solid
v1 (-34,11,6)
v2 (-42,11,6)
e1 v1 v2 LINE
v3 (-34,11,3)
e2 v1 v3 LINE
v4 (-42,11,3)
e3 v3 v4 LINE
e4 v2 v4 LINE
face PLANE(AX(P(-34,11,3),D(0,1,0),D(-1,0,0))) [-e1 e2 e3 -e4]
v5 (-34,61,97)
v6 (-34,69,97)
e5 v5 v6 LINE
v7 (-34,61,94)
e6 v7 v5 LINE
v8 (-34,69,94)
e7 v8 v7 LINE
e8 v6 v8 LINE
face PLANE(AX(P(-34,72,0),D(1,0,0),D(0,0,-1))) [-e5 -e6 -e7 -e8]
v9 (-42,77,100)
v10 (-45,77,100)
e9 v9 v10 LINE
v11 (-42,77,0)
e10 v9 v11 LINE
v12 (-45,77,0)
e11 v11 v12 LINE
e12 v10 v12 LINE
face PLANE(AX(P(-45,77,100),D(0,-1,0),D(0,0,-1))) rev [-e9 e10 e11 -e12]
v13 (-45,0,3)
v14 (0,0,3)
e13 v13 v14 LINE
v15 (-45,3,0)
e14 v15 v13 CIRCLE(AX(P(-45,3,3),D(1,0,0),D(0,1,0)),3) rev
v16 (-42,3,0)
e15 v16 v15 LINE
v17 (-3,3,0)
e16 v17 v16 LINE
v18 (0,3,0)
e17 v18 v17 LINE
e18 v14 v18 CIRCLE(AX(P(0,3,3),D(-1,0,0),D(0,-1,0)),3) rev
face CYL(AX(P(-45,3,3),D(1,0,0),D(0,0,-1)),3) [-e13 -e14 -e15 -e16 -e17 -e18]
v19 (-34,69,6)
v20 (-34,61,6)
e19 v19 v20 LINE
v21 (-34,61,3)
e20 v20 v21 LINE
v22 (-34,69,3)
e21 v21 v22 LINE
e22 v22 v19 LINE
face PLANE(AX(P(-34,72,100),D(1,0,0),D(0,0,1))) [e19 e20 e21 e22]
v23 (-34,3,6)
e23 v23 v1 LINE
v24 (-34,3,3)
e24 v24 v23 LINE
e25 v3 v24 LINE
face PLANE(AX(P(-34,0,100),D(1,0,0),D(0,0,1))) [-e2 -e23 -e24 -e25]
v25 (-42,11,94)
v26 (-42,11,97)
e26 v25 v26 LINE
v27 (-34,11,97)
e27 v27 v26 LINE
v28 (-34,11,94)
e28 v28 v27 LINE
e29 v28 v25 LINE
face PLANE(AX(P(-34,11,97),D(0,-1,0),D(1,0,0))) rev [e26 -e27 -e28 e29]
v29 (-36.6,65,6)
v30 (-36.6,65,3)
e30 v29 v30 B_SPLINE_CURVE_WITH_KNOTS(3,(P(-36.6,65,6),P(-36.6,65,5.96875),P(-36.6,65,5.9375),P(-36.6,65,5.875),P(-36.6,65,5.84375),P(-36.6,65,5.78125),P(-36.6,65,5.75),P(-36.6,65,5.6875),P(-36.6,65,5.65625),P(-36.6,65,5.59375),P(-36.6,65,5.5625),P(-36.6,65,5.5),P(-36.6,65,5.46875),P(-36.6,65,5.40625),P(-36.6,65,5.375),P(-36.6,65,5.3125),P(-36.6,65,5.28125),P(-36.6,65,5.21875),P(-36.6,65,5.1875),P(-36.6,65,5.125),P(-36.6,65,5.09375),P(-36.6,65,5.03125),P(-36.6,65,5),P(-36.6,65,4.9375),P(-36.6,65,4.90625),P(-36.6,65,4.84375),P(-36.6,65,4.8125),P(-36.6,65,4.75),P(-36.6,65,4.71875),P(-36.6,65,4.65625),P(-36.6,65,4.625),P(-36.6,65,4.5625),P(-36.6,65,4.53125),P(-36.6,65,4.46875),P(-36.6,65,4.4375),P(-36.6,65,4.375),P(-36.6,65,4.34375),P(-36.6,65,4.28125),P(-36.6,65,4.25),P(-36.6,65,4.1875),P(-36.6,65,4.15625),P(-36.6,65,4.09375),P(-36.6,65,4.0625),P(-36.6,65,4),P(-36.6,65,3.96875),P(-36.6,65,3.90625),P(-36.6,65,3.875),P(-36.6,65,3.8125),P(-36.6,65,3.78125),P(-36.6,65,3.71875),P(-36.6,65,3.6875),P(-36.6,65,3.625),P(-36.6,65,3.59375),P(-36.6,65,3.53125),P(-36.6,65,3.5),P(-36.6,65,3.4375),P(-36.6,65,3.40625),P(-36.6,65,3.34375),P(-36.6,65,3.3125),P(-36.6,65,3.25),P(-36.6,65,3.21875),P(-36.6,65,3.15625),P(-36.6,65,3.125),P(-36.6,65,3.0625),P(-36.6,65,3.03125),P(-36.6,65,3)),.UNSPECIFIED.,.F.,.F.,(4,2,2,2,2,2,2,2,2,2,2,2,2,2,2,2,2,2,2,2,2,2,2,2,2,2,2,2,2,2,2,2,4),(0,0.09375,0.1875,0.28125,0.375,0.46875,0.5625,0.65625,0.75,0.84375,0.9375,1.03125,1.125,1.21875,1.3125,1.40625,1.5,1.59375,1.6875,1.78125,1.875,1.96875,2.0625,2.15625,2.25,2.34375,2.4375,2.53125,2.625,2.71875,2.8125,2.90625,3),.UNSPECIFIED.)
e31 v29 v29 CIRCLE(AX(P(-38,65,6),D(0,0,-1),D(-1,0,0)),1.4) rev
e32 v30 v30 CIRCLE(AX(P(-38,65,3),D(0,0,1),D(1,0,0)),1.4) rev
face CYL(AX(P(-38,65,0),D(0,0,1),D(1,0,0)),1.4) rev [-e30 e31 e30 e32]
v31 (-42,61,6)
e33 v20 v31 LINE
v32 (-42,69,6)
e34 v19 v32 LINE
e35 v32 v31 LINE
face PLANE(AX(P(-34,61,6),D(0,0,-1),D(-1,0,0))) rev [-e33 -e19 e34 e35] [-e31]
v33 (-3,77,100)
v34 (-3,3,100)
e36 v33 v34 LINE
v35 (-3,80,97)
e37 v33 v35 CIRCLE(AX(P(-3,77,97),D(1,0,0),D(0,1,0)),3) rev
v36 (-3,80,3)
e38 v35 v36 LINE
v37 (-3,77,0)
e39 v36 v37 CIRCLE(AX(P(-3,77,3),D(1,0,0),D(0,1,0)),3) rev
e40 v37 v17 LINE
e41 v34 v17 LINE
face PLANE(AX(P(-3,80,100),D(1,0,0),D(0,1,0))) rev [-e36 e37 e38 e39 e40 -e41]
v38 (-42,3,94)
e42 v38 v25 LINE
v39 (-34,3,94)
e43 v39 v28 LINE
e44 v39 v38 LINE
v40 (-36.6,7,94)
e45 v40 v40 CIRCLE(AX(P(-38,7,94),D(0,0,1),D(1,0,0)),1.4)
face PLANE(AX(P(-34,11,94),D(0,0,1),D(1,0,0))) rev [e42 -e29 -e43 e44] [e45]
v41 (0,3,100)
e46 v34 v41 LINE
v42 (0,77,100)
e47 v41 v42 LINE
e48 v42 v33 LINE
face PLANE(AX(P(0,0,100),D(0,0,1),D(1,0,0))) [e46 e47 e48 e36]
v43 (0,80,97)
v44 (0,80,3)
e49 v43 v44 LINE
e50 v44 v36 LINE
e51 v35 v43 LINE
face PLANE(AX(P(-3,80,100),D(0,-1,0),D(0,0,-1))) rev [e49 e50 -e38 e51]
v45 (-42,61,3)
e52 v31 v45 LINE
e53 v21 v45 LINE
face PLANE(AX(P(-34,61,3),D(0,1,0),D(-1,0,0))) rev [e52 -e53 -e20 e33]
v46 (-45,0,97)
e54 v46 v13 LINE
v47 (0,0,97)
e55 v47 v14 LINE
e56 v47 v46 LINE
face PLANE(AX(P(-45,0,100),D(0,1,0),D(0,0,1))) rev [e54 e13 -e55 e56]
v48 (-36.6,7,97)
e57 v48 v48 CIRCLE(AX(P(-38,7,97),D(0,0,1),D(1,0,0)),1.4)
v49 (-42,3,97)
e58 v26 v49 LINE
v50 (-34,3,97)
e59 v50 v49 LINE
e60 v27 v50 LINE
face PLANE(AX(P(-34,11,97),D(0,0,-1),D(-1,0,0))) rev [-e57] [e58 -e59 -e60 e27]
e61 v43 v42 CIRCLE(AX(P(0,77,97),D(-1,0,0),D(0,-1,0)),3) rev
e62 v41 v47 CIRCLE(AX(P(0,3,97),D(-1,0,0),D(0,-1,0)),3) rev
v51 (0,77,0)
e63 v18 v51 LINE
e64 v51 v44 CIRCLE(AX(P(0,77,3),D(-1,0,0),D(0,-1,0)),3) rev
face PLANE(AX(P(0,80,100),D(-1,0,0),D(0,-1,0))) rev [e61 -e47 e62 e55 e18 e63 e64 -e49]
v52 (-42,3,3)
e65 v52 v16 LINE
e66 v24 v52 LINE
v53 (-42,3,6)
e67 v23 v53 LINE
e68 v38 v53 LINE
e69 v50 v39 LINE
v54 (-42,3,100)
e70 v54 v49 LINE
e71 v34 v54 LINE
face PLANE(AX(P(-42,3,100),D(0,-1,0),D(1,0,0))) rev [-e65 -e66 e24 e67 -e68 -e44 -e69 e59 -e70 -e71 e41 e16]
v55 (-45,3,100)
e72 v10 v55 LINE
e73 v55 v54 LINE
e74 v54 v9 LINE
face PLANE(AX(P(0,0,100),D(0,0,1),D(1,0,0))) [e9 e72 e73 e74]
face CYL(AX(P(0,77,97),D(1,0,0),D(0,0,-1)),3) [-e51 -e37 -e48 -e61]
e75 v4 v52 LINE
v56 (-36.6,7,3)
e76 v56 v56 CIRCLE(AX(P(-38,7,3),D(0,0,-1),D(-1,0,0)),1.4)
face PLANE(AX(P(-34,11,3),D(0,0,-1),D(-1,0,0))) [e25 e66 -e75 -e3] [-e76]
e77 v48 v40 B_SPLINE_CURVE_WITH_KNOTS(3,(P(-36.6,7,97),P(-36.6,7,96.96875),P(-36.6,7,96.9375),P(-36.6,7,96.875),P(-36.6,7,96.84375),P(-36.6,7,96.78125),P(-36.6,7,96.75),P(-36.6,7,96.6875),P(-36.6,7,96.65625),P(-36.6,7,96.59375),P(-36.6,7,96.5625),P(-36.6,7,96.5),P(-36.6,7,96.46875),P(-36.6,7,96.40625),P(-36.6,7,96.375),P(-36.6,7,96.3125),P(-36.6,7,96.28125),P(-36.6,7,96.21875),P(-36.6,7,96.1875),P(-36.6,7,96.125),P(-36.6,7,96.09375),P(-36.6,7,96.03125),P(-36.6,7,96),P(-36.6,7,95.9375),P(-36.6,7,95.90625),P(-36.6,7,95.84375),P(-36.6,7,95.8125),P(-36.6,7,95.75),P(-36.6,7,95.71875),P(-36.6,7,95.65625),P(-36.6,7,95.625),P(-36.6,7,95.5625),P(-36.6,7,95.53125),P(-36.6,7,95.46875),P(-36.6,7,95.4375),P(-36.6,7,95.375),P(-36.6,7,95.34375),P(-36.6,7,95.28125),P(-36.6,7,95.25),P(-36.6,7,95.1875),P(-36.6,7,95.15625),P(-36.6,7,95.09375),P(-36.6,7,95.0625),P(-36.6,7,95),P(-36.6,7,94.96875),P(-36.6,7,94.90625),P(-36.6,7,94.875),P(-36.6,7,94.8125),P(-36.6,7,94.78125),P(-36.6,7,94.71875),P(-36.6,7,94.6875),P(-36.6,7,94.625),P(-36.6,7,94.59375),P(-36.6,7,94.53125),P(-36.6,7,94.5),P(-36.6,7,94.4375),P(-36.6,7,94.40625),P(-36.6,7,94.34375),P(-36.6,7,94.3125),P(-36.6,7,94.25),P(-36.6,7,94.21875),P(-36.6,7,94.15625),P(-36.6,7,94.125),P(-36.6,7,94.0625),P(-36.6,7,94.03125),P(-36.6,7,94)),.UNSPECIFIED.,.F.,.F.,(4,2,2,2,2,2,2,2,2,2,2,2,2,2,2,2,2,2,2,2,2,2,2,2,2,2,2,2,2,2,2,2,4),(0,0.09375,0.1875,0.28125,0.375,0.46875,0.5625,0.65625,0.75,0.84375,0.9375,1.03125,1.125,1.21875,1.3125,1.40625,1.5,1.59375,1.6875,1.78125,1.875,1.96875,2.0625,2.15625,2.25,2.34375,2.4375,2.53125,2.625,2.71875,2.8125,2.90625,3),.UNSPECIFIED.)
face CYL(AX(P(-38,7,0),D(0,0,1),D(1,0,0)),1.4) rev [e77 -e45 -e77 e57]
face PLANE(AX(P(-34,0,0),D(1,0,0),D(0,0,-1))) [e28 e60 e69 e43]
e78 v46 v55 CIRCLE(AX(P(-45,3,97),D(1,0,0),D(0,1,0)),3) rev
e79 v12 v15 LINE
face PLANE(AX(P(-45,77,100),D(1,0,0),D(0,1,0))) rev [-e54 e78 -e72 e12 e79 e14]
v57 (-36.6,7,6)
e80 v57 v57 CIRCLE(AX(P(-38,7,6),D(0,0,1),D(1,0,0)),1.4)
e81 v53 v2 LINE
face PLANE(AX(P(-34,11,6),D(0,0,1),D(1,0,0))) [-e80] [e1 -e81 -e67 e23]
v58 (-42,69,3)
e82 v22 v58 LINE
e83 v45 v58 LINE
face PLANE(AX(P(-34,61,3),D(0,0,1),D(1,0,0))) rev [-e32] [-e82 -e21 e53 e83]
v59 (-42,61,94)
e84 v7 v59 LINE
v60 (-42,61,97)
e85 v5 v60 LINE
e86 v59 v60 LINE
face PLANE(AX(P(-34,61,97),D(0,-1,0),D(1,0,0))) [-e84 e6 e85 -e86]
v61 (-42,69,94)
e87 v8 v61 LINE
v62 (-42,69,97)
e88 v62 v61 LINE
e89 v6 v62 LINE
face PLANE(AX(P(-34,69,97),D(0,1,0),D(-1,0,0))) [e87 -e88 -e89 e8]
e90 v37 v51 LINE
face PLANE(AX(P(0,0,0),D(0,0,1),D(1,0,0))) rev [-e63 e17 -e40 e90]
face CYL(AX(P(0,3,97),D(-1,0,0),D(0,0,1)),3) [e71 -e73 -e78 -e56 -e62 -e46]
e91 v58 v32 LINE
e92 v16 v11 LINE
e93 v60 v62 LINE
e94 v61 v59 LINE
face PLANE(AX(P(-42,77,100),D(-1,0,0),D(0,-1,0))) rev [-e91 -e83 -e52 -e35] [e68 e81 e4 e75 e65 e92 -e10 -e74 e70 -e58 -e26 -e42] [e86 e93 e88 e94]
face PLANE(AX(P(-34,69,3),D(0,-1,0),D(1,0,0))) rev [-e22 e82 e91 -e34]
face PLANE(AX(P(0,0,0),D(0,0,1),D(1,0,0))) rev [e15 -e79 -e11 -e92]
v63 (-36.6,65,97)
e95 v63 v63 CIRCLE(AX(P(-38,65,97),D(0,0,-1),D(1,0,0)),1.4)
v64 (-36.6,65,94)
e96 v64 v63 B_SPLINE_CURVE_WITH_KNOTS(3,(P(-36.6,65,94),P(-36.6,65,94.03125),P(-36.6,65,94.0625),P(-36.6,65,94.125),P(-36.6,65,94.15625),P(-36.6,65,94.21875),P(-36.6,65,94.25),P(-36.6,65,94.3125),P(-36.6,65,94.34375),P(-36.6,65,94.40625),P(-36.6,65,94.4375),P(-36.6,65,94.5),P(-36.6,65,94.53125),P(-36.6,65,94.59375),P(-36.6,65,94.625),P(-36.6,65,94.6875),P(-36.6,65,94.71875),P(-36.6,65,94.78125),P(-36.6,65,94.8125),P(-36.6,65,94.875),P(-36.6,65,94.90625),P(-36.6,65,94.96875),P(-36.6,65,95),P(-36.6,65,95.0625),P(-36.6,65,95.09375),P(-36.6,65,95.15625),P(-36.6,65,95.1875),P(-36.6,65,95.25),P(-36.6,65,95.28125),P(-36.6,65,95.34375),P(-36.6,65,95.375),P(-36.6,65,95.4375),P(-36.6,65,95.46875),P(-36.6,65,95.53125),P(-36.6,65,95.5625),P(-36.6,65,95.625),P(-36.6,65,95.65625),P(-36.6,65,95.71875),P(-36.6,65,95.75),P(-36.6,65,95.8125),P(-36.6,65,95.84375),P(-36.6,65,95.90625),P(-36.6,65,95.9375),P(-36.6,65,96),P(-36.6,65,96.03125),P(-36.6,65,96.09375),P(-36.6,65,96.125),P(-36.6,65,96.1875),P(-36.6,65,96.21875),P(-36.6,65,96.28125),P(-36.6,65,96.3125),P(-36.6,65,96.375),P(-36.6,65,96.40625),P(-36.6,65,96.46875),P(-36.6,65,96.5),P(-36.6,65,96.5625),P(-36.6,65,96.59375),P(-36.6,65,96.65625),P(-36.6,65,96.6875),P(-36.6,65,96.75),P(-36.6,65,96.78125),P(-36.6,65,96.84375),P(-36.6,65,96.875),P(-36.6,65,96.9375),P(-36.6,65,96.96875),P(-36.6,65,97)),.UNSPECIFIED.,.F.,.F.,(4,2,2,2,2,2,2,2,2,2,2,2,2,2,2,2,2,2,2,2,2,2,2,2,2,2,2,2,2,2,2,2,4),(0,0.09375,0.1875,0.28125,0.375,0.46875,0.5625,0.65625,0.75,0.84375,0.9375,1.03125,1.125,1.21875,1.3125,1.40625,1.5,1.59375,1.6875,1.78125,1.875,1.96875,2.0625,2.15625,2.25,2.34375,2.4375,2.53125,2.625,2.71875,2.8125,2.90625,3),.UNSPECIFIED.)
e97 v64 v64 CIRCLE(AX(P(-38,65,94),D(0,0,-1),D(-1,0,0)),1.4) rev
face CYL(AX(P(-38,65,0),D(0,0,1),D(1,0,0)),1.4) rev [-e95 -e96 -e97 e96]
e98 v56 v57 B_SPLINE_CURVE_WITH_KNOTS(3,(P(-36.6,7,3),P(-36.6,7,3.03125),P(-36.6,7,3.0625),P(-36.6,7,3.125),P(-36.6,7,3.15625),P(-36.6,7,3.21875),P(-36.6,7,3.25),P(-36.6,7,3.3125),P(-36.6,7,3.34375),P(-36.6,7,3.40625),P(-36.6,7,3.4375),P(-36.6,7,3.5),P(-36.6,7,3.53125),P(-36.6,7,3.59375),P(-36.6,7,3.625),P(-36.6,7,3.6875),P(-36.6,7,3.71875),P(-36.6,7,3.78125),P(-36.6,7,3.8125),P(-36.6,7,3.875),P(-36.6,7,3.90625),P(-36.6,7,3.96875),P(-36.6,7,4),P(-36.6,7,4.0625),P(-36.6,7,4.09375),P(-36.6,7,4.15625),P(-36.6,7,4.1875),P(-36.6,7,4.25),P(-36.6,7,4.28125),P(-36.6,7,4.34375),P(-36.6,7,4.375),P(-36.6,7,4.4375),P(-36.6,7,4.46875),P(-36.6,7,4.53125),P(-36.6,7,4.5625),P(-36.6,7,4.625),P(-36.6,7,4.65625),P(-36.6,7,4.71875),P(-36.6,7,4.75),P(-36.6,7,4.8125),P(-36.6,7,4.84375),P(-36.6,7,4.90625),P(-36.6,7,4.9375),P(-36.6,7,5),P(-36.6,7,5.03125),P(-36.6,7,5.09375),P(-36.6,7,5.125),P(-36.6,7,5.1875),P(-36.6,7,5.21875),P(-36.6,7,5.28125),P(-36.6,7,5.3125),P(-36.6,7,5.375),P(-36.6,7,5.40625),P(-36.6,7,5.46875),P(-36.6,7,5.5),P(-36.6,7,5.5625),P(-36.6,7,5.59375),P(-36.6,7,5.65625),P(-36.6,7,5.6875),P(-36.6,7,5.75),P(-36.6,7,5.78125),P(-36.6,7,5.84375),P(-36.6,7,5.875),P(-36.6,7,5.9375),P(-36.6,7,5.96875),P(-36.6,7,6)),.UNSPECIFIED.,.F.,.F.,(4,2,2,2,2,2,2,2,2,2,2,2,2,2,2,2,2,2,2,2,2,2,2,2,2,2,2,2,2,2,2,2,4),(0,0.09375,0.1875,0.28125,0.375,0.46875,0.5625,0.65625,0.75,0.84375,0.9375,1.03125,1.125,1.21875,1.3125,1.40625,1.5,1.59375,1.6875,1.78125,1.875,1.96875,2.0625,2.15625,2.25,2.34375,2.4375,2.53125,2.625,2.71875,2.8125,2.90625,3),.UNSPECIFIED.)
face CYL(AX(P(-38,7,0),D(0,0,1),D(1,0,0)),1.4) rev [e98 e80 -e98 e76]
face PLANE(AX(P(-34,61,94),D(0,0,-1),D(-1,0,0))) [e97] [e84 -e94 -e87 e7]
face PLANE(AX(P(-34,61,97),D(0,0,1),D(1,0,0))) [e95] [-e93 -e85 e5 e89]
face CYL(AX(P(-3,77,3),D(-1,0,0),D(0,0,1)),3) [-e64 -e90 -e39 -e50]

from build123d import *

# Parameters (mm, degrees)
BOSS_EXTRUDE1_DEPTH                        = 100
SKETCH2_W                                  = 3
SKETCH2_H                                  = 8
BOSS_EXTRUDE2_DEPTH                        = 8
MIRROR1_AT_THE_SECOND_PLANE_COPY_1_SKETC_W = 3
MIRROR1_AT_THE_SECOND_PLANE_COPY_1_SKETC_H = 8
MIRROR1_AT_THE_SECOND_PLANE_COPY_1_DEPTH   = 8
SKETCH3_R                                  = 1.4
CUT_EXTRUDE1_DEPTH                         = 134.54400024
FILLET1_START                              = -46
FILLET1_DEPTH                              = 47


with BuildPart() as part:
    # Sketch1 → Boss-Extrude1 (new body)
    with BuildSketch(Plane.XY):
        Polygon((-3, 80), (0, 80), (0, 0), (-45, 0), (-45, 77), (-42, 77), (-42, 3), (-3, 3), align=None)
    extrude(amount=BOSS_EXTRUDE1_DEPTH)

    # Sketch2 → Boss-Extrude2 (add)
    with BuildSketch(Plane(origin=(-42, 0, 0), x_dir=(0, 0, -1), z_dir=(1, 0, 0))):
        with Locations((-95.5, 7)):
            Rectangle(SKETCH2_W, SKETCH2_H)
    boss_extrude2 = extrude(amount=BOSS_EXTRUDE2_DEPTH)

    # Mirror1: Boss-Extrude2 across plane
    add(boss_extrude2.mirror(Plane.ZX.offset(36)))

    # Mirror1 at the second plane: Boss-Extrude2 across plane
    add(boss_extrude2.mirror(Plane.XY.offset(50)))

    # Mirror1 at the second plane copy 1 sketc → Mirror1 at the second plane copy 1 (add)
    with BuildSketch(Plane(origin=(-42, 72, 100), x_dir=(0, 0, 1), z_dir=(1, 0, 0))):
        with Locations((-95.5, 7)):
            Rectangle(MIRROR1_AT_THE_SECOND_PLANE_COPY_1_SKETC_W, MIRROR1_AT_THE_SECOND_PLANE_COPY_1_SKETC_H)
    extrude(amount=MIRROR1_AT_THE_SECOND_PLANE_COPY_1_DEPTH)

    # Sketch3 → Cut-Extrude1 (cut, through all)
    with BuildSketch(Plane.XY.offset(97)):
        with Locations((-38, 7)):
            Circle(SKETCH3_R)
    cut_extrude1 = extrude(amount=-CUT_EXTRUDE1_DEPTH, mode=Mode.SUBTRACT)

    # Mirror2: Cut-Extrude1 across plane
    add(cut_extrude1.mirror(Plane.ZX.offset(36)), mode=Mode.SUBTRACT)

    # Fillet1: read off the stored shape, not the designer's step
    # Fillet1 outline → Fillet1 (cut)
    with BuildSketch(Plane.YZ.offset(FILLET1_START)):
        with BuildLine():
            Line((80, 0), (80, 3))
            ThreePointArc((80, 3), (79.121320344, 0.878679656), (77, 0))
            Line((77, 0), (80, 0))
        make_face()
        with BuildLine():
            ThreePointArc((77, 100), (79.121320344, 99.121320344), (80, 97))
            Line((80, 97), (80, 100))
            Line((80, 100), (77, 100))
        make_face()
        with BuildLine():
            Line((0, 0), (3, 0))
            ThreePointArc((3, 0), (0.878679656, 0.878679656), (0, 3))
            Line((0, 3), (0, 0))
        make_face()
        with BuildLine():
            ThreePointArc((0, 97), (0.878679656, 99.121320344), (3, 100))
            Line((3, 100), (0, 100))
            Line((0, 100), (0, 97))
        make_face()
    extrude(amount=FILLET1_DEPTH, mode=Mode.SUBTRACT)


solid = part.part
